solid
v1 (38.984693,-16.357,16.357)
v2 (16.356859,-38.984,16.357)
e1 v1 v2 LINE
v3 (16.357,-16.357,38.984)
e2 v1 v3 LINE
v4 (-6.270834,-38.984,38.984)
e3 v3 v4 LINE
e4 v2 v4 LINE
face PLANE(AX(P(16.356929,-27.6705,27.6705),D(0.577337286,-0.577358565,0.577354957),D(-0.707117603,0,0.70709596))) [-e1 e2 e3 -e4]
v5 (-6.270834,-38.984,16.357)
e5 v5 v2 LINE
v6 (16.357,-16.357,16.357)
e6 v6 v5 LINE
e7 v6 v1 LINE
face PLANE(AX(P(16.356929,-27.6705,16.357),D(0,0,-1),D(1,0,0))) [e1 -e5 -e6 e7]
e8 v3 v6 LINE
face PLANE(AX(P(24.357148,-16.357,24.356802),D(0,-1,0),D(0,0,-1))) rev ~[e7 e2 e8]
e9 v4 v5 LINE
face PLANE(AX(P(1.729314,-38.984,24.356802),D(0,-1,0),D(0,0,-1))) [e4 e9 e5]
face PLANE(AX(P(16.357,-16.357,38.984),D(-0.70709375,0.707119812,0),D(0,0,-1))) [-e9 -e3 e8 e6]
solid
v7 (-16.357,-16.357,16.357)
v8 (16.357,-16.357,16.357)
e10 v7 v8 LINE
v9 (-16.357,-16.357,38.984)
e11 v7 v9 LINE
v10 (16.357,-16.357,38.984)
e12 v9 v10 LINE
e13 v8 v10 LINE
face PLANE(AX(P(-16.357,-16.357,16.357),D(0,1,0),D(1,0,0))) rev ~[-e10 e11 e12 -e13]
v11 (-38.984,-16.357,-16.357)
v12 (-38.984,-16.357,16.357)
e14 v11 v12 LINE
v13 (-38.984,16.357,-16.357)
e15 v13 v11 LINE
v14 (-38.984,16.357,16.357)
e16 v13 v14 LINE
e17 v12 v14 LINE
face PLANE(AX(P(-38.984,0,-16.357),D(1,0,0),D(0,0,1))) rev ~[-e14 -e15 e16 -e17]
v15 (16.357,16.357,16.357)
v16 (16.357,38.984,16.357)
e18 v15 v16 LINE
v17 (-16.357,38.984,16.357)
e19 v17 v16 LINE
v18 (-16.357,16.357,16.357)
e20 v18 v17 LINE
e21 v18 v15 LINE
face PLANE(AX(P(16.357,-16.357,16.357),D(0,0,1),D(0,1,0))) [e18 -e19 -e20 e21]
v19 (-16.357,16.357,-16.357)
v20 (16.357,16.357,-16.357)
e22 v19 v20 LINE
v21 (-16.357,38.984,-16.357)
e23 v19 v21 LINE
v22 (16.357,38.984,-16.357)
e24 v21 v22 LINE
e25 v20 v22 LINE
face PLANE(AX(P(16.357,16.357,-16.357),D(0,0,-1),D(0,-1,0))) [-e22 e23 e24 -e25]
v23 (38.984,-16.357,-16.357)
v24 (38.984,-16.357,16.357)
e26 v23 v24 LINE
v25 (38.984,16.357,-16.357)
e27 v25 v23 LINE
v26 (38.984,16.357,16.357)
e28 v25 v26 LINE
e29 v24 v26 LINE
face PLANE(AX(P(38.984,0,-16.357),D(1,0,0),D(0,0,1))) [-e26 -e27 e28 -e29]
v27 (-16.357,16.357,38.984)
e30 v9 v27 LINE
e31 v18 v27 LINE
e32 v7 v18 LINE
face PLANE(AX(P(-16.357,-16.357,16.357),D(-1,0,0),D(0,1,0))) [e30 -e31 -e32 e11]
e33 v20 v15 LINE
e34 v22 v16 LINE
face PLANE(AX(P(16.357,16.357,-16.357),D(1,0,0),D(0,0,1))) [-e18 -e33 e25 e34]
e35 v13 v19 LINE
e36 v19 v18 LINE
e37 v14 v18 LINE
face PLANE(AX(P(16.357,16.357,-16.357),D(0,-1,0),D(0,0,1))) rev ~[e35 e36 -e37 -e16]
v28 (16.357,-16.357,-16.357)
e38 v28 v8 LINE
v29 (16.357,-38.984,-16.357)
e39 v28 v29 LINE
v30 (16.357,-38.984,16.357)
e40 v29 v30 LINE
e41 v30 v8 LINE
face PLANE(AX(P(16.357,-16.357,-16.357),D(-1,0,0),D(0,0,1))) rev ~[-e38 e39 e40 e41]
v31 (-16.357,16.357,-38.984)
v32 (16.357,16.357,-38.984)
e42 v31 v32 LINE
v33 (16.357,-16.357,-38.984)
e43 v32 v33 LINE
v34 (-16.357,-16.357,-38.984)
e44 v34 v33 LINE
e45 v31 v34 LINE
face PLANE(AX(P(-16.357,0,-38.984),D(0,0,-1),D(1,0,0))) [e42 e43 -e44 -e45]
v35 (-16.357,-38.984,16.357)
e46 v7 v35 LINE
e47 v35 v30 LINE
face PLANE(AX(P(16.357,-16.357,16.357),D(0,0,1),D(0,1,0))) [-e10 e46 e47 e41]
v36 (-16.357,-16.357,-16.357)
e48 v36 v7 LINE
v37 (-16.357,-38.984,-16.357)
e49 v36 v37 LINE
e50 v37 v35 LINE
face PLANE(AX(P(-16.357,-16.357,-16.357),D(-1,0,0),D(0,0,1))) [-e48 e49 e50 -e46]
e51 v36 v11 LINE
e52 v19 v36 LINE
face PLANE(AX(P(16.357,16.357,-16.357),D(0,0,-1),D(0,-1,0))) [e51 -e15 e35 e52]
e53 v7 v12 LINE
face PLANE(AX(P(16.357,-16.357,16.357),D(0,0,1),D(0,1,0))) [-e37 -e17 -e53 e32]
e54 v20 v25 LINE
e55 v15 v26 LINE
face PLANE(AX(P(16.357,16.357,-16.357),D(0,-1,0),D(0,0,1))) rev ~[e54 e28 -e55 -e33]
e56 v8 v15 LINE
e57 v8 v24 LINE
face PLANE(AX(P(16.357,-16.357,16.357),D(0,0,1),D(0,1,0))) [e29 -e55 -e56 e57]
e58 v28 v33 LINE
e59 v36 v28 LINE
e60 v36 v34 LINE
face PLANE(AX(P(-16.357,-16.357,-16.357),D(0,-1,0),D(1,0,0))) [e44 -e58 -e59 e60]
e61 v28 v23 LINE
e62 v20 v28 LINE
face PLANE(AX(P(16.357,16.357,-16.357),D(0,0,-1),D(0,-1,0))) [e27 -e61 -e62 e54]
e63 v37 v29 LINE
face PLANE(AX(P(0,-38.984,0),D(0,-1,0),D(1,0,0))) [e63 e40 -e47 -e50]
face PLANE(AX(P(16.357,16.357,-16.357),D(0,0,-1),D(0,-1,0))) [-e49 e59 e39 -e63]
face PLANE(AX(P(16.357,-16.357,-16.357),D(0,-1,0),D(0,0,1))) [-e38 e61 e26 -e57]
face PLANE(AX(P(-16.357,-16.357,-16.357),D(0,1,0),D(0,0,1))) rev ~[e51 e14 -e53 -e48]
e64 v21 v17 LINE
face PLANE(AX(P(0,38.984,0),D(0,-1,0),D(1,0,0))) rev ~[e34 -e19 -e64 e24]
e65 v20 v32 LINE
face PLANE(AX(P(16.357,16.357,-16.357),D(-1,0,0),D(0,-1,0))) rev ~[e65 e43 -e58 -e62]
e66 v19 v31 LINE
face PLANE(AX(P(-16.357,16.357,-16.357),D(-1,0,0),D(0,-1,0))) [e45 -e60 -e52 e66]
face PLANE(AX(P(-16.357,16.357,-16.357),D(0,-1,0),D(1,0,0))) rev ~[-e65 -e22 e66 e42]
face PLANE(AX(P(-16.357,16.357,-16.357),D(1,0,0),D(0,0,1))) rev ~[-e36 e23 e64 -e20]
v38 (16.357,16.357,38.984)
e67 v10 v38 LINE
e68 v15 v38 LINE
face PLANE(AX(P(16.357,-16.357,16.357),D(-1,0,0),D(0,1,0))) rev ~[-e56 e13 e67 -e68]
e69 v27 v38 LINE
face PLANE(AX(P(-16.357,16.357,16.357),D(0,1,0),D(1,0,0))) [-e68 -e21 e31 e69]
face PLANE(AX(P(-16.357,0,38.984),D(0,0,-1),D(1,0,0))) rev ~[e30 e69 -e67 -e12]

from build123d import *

# Parameters (mm, degrees)
F0_W     = 32.714
F0_H     = 32.714
F1_DEPTH = 16.357
F2_DEPTH = 22.627
F3_DEPTH = 22.627
F4_DEPTH = 22.627
F5_DEPTH = 22.627
F6_DEPTH = 22.627
F7_DEPTH = 22.627


with BuildPart() as f1:
    # F0 (on Front) → F1 (new body, symmetric)
    with BuildSketch(Plane.XZ):
        Rectangle(F0_W, F0_H)
    extrude(amount=F1_DEPTH, both=True)


with BuildPart() as f2:
    # F2 (new): a face of the model
    f2_faces = [f1.part.faces().sort_by_distance(p)[0] for p in [
        (-16.357, 0, 0),
    ]]
    extrude(f2_faces, amount=F2_DEPTH)


with BuildPart() as f3:
    # F3 (new): a face of the model
    f3_faces = [f1.part.faces().sort_by_distance(p)[0] for p in [
        (0, -16.357, 0),
    ]]
    extrude(f3_faces, amount=F3_DEPTH)


with BuildPart() as f4:
    # F4 (new): a face of the model
    f4_faces = [f1.part.faces().sort_by_distance(p)[0] for p in [
        (16.357, 0, 0),
    ]]
    extrude(f4_faces, amount=F4_DEPTH)


with BuildPart() as f5:
    # F5 (new): a face of the model
    f5_faces = [f1.part.faces().sort_by_distance(p)[0] for p in [
        (0, 16.357, 0),
    ]]
    extrude(f5_faces, amount=F5_DEPTH)


with BuildPart() as f6:
    # F6 (new): a face of the model
    f6_faces = [f1.part.faces().sort_by_distance(p)[0] for p in [
        (0, 0, 16.357),
    ]]
    extrude(f6_faces, amount=F6_DEPTH)


with BuildPart() as f1_1:
    add(f1.part)

    # F7 (add): a face of the model
    f7_faces = [f1_1.faces().sort_by_distance(p)[0] for p in [
        (0, 0, -16.357),
    ]]

    add(f2.part)  # F7 merges F2

    add(f3.part)  # F7 merges F3

    add(f4.part)  # F7 merges F4

    add(f5.part)  # F7 merges F5
    extrude(f7_faces, amount=F7_DEPTH)

    # F8: union F6
    add(f6.part)


with BuildPart() as f11:
    # F11: sweep along a path in F10
    with BuildLine(Plane.XY.offset(16.357)) as f11_path:
        Line((38.9848339741, -16.357), (16.357, -38.984))
    # F9 (on face) → F11 (sweep)
    with BuildSketch(Plane.XZ.offset(16.357)):
        Polygon((16.357, 38.984), (16.357, 16.357), (38.9846925693, 16.357), align=None)
    sweep(path=f11_path.line)


solid = Compound([f1_1.part, f11.part])
